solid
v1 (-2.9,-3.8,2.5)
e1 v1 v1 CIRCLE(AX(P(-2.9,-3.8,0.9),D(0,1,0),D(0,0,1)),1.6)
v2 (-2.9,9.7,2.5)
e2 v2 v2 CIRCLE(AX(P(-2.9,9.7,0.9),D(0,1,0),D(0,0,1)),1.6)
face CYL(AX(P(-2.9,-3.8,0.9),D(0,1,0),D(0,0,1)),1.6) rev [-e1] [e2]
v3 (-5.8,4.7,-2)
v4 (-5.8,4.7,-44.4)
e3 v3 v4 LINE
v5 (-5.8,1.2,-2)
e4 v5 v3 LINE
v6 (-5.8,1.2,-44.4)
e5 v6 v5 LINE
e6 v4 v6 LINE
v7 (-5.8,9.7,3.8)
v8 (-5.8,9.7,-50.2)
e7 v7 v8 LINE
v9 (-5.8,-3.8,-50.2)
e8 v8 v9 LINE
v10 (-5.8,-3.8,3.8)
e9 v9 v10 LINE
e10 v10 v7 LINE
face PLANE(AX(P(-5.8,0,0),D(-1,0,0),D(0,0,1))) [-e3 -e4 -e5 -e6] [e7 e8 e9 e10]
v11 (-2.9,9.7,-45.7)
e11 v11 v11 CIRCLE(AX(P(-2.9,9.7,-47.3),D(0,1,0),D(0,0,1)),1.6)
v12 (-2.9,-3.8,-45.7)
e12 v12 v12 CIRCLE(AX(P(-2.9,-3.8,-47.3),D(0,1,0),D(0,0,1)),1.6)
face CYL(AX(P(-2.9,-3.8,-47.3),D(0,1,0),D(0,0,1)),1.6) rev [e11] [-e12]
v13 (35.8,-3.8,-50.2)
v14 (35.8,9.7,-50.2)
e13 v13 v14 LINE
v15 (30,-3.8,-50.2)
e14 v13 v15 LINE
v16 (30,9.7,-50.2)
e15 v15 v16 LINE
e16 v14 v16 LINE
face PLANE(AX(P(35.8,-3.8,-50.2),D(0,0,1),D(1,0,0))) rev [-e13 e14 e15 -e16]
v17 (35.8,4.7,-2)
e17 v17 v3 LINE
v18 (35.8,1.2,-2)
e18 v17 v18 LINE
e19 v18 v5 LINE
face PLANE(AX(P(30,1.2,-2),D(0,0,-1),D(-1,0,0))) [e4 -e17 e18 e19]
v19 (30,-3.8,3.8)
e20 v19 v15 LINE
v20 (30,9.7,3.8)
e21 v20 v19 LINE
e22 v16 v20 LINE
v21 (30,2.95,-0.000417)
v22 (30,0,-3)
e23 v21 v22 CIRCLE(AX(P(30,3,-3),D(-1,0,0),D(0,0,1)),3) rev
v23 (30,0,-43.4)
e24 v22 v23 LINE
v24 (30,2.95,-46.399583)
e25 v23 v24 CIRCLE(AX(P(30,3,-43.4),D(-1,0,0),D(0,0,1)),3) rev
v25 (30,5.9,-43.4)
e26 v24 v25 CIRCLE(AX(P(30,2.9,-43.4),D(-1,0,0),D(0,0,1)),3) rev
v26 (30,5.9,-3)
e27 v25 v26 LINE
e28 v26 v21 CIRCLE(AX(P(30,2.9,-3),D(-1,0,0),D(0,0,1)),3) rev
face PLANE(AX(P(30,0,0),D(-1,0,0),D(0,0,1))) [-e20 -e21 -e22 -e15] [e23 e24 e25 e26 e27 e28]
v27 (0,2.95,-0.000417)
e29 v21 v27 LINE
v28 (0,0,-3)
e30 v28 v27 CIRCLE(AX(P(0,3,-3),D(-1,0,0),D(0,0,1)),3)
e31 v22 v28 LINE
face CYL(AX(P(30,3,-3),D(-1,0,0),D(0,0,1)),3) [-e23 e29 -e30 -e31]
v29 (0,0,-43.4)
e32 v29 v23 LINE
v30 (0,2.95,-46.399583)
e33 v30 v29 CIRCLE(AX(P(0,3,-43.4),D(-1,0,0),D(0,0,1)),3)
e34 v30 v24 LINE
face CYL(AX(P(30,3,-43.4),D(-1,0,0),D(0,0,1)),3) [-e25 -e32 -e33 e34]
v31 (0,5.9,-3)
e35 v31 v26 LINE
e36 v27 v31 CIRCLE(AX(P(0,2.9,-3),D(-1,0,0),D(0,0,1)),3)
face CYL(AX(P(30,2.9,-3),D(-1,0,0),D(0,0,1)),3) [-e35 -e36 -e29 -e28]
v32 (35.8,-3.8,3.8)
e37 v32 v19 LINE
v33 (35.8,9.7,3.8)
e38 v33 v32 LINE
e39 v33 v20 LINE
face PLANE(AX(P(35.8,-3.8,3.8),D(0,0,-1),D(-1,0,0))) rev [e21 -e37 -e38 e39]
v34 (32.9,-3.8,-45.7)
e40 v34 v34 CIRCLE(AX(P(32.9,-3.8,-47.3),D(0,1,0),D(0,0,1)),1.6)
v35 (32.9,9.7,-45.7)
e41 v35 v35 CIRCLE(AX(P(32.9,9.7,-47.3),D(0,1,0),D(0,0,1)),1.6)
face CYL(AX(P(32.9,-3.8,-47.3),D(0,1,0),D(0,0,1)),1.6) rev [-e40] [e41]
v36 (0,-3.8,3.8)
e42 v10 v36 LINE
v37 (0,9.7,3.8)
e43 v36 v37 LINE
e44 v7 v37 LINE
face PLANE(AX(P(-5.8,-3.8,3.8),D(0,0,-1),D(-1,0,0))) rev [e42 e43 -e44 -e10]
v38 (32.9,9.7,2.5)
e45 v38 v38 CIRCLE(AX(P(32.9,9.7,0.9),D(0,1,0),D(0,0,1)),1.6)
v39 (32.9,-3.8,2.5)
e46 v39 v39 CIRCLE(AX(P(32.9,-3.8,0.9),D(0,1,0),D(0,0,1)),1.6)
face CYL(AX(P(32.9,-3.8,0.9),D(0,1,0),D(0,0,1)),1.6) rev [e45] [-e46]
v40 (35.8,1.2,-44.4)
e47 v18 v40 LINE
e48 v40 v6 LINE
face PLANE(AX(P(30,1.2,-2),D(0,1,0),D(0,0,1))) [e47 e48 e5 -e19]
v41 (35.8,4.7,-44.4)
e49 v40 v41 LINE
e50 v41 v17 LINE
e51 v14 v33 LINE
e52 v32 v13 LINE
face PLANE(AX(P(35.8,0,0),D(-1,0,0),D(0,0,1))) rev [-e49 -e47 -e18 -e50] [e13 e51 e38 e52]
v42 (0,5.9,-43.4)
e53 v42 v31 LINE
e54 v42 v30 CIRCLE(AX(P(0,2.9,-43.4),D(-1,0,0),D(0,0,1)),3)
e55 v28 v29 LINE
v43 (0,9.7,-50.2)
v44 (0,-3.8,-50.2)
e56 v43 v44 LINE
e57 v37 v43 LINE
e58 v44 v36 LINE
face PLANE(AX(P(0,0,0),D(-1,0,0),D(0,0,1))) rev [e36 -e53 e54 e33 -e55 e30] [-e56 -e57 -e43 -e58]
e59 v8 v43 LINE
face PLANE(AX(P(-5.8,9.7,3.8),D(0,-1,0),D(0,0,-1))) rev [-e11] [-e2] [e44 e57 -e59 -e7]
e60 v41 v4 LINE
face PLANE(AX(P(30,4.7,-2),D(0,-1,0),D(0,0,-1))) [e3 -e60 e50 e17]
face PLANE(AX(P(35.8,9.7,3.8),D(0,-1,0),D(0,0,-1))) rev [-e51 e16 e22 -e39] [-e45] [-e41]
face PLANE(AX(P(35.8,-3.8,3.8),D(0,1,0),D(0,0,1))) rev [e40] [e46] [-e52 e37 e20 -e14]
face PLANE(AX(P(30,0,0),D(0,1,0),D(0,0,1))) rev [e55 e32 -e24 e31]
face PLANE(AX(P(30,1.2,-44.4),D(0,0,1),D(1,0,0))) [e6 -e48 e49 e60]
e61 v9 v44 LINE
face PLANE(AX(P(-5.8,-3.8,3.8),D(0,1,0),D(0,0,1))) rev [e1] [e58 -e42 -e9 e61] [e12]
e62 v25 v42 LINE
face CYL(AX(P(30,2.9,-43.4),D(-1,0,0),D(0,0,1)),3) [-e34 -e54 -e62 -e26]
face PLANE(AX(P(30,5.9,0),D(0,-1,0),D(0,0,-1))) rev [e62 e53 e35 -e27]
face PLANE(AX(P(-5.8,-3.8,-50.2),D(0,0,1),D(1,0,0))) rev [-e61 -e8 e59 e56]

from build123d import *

# Parameters (mm, degrees)
SKETCH1_W           = 46.4
SKETCH1_H           = 5.9
SKETCH1_W_2         = 42.4
SKETCH1_H_2         = 3.5
BOSS_EXTRUDE1_DEPTH = 30
FILLET2_R           = 3
SKETCH2_W           = 54
SKETCH2_H           = 13.5
SKETCH2_W_2         = 42.4
SKETCH2_H_2         = 3.5
BOSS_EXTRUDE2_DEPTH = 5.8
SKETCH3_W           = 54
SKETCH3_H           = 13.5
SKETCH3_W_2         = 42.4
SKETCH3_H_2         = 3.5
BOSS_EXTRUDE3_DEPTH = 5.8
SKETCH4_R           = 1.6
CUT_EXTRUDE1_DEPTH  = 64.118380841


with BuildPart() as part:
    # Sketch1 → Boss-Extrude1 (new body)
    with BuildSketch(Plane(origin=(0, 0, 0), x_dir=(0, 0, -1), z_dir=(1, 0, 0))):
        with Locations((23.2, 2.95)):
            Rectangle(SKETCH1_W, SKETCH1_H)
        with Locations((23.2, 2.95)):
            Rectangle(SKETCH1_W_2, SKETCH1_H_2, mode=Mode.SUBTRACT)
    extrude(amount=BOSS_EXTRUDE1_DEPTH)

    # Fillet2
    # the kernel refuses this fillet: 3 mm, written as the material it takes off along each edge
    with BuildSketch(Plane(origin=(-7.5, 0, -46.4), x_dir=(0, 0, 1), z_dir=(1, 0, 0)), Plane(origin=(-7.5, 5.9, 0), x_dir=(0, 0, -1), z_dir=(1, 0, 0)), Plane(origin=(-7.5, 5.9, -46.4), x_dir=(0, -1, 0), z_dir=(1, 0, 0))) as fillet2_piece_1:
        with BuildLine():
            CenterArc((FILLET2_R, -FILLET2_R), FILLET2_R, 90, 90)
            Line((0, -FILLET2_R), (0, 0))
            Line((0, 0), (FILLET2_R, 0))
        make_face()
    extrude(amount=45, mode=Mode.SUBTRACT)
    with BuildSketch(Plane(origin=(-7.5, 0, 0), x_dir=(0, 0, -1), z_dir=(1, 0, 0))) as fillet2_piece_2:
        with BuildLine():
            CenterArc((FILLET2_R, FILLET2_R), FILLET2_R, 180, 90)
            Line((0, FILLET2_R), (0, 0))
            Line((0, 0), (FILLET2_R, 0))
        make_face()
    extrude(amount=45, mode=Mode.SUBTRACT)

    # Sketch2 → Boss-Extrude2 (add)
    with BuildSketch(Plane(origin=(30, 0, 0), x_dir=(0, 0, -1), z_dir=(1, 0, 0))):
        with Locations((23.2, 2.95)):
            Rectangle(SKETCH2_W, SKETCH2_H)
        with Locations((23.2, 2.95)):
            Rectangle(SKETCH2_W_2, SKETCH2_H_2, mode=Mode.SUBTRACT)
    extrude(amount=BOSS_EXTRUDE2_DEPTH)

    # Sketch3 → Boss-Extrude3 (add)
    with BuildSketch(Plane.ZY):
        with Locations((-23.2, 2.95)):
            Rectangle(SKETCH3_W, SKETCH3_H)
        with Locations((-23.2, 2.95)):
            Rectangle(SKETCH3_W_2, SKETCH3_H_2, mode=Mode.SUBTRACT)
    extrude(amount=BOSS_EXTRUDE3_DEPTH)

    # Sketch4 → Cut-Extrude1 (cut, through all)
    with BuildSketch(Plane(origin=(0, 9.7, 0), x_dir=(1, 0, 0), z_dir=(0, 1, 0))):
        with Locations(Location((-2.9, 47.3, 0), (0, 0, 270))):
            Circle(SKETCH4_R)
        with Locations(Location((32.9, 47.3, 0), (0, 0, 270))):
            Circle(SKETCH4_R)
        with Locations(Location((-2.9, -0.9, 0), (0, 0, 270))):
            Circle(SKETCH4_R)
        with Locations(Location((32.9, -0.9, 0), (0, 0, 270))):
            Circle(SKETCH4_R)
    extrude(amount=-CUT_EXTRUDE1_DEPTH, mode=Mode.SUBTRACT)


solid = part.part
